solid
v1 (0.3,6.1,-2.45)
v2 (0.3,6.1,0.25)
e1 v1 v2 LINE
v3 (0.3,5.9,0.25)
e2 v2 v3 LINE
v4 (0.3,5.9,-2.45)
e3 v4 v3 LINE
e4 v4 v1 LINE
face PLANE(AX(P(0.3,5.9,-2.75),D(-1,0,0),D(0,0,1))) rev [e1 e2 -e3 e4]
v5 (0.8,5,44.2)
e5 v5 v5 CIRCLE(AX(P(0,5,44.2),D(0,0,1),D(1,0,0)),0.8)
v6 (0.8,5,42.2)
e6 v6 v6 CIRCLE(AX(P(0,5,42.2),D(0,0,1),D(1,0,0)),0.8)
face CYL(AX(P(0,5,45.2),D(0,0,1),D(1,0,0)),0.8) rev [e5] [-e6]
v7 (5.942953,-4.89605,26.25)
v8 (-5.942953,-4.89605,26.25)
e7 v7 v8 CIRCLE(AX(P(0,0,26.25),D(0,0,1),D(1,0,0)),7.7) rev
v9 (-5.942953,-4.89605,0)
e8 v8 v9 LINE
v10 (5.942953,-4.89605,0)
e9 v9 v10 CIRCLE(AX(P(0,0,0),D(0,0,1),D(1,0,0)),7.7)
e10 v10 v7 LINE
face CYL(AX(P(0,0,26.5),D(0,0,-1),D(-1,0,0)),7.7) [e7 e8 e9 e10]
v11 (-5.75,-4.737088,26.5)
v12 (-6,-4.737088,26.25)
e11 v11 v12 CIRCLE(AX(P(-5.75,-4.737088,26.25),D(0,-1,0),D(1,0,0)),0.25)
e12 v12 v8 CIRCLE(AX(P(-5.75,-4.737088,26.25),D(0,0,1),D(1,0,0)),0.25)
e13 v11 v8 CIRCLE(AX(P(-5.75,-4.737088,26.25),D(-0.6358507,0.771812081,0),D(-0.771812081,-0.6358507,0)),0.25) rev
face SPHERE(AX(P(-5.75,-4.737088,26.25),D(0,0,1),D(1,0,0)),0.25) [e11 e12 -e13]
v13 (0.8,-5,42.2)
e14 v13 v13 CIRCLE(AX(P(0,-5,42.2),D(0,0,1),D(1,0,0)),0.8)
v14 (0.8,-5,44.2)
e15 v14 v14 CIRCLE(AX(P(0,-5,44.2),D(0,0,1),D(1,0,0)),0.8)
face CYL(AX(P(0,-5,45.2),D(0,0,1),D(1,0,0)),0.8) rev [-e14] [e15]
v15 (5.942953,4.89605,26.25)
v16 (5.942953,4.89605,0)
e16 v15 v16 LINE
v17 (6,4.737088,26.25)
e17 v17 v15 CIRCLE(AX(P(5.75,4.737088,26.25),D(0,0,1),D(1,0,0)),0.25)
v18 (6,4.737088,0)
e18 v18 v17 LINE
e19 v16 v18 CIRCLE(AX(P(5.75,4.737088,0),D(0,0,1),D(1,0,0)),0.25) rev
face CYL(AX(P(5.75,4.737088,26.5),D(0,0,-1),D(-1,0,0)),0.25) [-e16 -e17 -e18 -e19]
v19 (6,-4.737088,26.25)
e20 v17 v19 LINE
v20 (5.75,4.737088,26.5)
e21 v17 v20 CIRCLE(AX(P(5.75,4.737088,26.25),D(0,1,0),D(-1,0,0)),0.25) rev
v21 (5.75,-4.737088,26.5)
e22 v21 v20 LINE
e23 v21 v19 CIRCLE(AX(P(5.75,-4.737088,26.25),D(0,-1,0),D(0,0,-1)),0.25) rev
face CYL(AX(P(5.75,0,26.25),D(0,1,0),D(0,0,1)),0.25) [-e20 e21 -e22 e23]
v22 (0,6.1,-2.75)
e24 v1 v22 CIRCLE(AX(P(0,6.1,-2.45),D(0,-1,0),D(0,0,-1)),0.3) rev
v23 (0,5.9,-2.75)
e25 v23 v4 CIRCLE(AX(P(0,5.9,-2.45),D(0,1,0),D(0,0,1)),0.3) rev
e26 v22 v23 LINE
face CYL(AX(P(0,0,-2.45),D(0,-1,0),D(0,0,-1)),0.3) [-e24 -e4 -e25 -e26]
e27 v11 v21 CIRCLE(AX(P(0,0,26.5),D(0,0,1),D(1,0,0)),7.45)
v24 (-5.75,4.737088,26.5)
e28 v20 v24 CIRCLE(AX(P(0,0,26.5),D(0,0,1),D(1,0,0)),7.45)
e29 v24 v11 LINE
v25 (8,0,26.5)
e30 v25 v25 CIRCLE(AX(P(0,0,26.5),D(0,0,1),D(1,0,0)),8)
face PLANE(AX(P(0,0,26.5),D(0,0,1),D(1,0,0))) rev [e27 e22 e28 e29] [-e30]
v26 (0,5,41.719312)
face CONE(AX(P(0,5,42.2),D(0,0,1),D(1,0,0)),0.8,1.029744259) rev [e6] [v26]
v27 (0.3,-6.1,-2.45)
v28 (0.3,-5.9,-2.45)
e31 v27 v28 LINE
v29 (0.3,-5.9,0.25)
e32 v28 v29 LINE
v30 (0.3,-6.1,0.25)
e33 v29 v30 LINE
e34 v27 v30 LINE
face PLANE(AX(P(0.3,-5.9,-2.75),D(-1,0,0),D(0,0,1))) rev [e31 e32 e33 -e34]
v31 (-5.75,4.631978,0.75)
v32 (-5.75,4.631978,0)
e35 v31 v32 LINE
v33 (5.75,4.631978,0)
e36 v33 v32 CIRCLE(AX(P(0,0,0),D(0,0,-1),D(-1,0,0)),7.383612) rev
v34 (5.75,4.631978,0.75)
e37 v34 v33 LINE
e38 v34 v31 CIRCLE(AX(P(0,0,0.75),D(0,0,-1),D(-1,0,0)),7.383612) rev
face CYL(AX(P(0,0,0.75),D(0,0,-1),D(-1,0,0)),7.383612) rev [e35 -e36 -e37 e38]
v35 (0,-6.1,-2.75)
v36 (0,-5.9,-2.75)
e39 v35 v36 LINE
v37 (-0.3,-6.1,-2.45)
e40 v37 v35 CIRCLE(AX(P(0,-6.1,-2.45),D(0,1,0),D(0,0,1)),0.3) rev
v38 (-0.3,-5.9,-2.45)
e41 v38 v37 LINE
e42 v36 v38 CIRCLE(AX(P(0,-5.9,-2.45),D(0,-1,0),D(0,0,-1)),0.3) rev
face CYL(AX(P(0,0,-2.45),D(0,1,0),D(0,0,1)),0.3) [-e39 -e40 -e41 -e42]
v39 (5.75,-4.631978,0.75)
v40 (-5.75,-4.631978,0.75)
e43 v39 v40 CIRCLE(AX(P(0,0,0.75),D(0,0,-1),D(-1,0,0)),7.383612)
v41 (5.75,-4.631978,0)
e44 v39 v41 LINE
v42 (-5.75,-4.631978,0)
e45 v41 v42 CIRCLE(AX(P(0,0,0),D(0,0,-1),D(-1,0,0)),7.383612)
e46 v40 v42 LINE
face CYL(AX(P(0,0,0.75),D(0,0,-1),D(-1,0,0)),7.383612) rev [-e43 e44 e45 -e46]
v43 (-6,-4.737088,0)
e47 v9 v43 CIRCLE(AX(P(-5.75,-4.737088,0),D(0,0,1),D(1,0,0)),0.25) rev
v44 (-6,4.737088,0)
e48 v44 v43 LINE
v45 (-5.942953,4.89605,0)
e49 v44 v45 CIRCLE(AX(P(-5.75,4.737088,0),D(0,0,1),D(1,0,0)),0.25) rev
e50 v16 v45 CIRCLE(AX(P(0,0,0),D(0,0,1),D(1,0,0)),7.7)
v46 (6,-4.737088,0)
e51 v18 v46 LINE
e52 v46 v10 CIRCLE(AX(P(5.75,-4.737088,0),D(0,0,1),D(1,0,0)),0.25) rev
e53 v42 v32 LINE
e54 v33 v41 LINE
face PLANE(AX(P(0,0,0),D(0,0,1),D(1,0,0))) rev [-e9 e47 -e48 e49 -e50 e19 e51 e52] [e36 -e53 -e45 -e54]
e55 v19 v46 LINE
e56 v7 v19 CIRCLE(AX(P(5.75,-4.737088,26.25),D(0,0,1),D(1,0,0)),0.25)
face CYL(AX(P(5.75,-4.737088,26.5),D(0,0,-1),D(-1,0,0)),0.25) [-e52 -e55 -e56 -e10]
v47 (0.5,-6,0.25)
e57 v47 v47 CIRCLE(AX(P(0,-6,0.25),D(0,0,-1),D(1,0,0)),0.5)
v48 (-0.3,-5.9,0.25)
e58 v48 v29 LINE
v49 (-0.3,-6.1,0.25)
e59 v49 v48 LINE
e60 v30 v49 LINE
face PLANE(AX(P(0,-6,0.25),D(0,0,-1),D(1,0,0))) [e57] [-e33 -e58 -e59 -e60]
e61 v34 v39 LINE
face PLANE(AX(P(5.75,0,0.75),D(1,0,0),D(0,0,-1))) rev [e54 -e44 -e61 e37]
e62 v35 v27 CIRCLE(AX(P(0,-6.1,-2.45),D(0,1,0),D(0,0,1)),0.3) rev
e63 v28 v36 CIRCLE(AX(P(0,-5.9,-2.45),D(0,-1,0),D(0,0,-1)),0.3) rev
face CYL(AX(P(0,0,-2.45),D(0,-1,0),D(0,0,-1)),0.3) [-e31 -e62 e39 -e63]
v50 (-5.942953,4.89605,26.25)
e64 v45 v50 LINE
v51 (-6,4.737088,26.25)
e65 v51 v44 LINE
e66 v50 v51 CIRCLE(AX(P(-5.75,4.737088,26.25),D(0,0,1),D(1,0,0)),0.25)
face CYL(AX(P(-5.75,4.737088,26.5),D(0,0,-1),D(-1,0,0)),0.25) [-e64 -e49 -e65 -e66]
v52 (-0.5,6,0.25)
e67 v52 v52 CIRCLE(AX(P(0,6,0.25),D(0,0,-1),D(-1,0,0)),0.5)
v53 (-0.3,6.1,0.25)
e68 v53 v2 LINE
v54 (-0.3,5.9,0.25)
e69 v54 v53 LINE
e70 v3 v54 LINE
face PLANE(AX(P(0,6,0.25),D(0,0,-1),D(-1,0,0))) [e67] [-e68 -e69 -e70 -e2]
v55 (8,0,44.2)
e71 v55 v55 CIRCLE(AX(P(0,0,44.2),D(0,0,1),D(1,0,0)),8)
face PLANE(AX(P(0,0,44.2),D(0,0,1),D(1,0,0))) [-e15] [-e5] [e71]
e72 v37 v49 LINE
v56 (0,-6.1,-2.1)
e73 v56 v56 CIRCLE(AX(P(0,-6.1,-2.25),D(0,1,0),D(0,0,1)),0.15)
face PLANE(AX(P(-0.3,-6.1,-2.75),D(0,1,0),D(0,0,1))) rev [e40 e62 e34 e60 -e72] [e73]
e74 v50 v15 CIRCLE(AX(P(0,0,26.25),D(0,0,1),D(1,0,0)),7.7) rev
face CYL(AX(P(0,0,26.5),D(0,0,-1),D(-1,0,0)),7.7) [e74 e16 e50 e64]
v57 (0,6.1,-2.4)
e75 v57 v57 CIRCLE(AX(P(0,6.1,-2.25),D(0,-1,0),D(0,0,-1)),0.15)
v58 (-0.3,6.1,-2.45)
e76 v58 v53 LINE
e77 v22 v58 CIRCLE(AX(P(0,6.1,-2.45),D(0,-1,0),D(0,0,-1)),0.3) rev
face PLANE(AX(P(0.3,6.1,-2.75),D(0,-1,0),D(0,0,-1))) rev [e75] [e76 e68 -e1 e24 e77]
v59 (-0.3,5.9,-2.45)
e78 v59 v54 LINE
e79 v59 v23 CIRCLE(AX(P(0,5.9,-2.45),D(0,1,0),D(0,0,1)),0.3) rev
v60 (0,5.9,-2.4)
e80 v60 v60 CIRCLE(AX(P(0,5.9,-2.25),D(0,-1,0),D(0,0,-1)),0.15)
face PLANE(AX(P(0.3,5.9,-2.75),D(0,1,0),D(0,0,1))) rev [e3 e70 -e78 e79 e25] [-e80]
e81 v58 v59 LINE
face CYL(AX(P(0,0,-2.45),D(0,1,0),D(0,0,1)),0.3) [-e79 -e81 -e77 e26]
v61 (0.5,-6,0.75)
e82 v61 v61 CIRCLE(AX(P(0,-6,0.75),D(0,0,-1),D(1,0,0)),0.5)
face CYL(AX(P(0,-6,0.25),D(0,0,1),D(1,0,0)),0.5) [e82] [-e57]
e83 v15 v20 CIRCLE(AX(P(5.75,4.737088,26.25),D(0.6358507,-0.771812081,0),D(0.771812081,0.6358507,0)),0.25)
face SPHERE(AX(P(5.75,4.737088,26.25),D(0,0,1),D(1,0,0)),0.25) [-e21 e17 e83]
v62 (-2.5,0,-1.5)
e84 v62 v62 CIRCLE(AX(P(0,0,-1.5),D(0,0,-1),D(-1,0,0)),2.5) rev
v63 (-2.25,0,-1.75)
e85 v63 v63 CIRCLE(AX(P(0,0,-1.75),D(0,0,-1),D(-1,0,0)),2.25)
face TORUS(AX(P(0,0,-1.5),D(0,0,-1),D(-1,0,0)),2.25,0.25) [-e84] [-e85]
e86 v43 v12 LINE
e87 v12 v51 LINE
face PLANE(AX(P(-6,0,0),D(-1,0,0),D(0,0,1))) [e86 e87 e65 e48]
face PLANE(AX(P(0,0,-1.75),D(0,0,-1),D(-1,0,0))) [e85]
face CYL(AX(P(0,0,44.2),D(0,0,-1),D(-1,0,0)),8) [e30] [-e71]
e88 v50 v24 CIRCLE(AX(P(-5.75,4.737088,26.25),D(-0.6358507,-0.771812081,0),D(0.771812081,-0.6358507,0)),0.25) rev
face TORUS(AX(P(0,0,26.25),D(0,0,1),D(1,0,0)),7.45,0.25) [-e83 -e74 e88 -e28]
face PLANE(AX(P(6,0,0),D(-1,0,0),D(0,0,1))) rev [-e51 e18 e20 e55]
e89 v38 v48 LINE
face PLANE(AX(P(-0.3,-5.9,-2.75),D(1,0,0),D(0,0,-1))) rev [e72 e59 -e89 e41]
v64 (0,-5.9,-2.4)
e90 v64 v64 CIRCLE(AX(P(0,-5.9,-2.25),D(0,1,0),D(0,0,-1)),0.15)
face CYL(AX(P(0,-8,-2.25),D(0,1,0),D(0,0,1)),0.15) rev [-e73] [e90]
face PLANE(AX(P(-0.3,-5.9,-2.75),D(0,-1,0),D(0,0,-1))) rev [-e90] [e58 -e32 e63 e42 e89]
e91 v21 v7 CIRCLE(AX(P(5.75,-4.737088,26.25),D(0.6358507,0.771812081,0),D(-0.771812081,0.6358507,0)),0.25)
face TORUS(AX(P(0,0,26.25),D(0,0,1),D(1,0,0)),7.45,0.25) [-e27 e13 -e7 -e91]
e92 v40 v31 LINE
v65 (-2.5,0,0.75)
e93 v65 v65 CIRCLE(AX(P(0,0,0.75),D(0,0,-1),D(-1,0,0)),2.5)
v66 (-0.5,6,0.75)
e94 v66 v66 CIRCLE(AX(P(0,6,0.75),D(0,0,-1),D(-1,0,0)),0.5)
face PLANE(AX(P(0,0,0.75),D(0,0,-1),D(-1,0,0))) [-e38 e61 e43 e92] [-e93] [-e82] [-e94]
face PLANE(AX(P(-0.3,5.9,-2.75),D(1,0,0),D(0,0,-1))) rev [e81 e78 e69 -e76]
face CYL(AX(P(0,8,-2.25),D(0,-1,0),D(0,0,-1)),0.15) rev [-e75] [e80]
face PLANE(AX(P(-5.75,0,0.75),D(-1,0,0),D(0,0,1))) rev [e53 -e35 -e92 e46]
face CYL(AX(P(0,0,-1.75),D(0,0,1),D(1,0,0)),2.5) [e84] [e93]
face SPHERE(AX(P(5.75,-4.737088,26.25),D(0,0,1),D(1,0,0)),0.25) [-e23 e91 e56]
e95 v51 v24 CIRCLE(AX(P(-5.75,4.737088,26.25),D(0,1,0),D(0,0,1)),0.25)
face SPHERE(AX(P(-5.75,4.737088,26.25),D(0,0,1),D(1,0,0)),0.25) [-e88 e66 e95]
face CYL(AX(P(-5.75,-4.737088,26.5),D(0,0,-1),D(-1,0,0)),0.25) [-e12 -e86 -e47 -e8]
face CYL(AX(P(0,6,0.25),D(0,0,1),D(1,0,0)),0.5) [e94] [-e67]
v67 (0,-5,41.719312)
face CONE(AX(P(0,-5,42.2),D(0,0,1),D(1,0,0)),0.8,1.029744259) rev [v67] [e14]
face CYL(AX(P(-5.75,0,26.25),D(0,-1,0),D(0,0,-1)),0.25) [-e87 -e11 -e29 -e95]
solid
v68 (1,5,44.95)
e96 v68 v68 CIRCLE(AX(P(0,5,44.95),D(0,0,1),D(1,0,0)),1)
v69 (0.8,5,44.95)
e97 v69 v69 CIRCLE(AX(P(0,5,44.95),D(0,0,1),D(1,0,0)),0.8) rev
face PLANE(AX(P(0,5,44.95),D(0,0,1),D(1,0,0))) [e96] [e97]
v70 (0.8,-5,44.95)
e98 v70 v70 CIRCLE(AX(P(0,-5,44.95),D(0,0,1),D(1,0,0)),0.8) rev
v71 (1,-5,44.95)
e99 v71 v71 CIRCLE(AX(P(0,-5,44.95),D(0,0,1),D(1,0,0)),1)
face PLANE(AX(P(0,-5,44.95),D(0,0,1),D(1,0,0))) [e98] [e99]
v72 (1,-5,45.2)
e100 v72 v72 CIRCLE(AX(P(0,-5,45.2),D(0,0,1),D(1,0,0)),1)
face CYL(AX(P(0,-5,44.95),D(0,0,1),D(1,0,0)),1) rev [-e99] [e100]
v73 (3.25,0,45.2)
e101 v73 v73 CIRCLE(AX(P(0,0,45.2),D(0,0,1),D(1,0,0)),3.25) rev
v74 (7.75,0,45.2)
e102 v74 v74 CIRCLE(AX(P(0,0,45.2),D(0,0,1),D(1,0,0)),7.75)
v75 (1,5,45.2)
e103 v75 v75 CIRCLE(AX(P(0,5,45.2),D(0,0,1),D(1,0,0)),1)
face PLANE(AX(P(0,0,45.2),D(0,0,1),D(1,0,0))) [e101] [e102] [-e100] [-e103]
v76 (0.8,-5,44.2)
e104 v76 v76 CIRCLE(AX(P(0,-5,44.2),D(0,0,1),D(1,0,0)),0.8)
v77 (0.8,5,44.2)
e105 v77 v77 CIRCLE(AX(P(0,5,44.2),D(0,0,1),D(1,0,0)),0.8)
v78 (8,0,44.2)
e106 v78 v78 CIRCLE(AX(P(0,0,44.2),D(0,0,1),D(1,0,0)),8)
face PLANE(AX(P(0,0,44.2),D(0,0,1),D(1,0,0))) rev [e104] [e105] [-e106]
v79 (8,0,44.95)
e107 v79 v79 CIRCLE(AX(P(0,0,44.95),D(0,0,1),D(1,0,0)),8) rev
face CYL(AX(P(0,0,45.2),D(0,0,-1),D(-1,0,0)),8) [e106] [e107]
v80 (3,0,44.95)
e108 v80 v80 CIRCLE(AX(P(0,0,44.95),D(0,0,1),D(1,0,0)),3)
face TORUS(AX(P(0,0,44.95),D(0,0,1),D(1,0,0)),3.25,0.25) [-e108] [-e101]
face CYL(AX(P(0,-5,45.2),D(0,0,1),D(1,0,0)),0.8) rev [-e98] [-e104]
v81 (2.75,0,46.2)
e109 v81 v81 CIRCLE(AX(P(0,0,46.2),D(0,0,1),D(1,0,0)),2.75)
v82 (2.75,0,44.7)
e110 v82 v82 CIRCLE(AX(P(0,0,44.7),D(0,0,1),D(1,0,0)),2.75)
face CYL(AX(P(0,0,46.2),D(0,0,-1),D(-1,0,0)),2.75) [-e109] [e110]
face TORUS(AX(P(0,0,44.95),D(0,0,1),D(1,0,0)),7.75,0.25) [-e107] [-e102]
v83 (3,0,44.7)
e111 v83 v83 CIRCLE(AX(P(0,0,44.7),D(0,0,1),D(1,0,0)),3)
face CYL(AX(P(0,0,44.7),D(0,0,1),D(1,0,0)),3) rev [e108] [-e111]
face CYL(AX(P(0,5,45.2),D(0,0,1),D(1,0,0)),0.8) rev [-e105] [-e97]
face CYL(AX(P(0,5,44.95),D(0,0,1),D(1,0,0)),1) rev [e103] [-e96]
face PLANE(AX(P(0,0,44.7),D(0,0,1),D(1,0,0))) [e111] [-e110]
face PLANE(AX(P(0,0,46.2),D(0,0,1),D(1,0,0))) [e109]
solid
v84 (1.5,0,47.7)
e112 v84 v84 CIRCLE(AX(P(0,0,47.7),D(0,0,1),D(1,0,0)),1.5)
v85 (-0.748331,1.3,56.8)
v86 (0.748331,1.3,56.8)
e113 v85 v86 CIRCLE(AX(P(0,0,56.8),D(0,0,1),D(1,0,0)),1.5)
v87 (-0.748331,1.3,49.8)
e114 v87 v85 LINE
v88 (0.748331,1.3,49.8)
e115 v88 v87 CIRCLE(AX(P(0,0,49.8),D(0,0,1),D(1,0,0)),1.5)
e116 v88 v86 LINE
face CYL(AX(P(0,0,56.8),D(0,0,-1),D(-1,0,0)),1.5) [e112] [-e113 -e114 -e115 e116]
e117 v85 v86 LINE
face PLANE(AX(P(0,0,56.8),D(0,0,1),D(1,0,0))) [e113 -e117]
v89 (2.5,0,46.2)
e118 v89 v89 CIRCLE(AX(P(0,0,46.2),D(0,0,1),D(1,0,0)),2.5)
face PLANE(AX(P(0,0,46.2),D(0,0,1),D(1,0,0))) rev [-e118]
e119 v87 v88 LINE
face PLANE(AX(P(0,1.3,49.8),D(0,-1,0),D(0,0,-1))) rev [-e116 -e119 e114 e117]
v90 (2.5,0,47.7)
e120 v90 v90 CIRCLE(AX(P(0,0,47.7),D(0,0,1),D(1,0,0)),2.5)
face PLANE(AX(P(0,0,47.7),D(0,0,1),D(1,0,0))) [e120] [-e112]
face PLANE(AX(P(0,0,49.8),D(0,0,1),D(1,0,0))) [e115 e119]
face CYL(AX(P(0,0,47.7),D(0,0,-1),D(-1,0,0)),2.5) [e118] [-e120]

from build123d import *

# Parameters (mm, degrees)
SKETCH_1_R                       = 7.7
EXTRUDE_1_DEPTH                  = 26.5
CUT_EXTRUDE_1_DEPTH              = 29.65013089
FILLET_1_R                       = 0.25
SKETCH_4_R                       = 8
EXTRUDE_2_DEPTH                  = 17.7
SKETCH_5_R                       = 8
EXTRUDE_3_DEPTH                  = 1
SKETCH_6_R                       = 3
CUT_EXTRUDE_2_DEPTH              = 0.5
FILLET_3_R                       = 0.25
SKETCH_7_R                       = 2.75
EXTRUDE_4_DEPTH                  = 1.5
SKETCH_8_R                       = 2.5
EXTRUDE_5_DEPTH                  = 1.5
SKETCH_9_R                       = 1.5
EXTRUDE_6_DEPTH                  = 9.1
CUT_EXTRUDE_3_DEPTH              = 7
M2X0_4_1_AT_2_COUNT              = 2
M2X0_4_1_AT_2_PITCH              = 10
SKETCH_16_R                      = 1
CUT_EXTRUDE_4_DEPTH              = 0.25
CUT_EXTRUDE_5_DEPTH              = 0.75
SKETCH_18_R                      = 2.5
EXTRUDE_7_DEPTH                  = 2.5
FILLET_4_R                       = 0.25
SKETCH_19_R                      = 0.5
EXTRUDE_8_DEPTH                  = 0.5
SKETCH_20_W                      = 0.6
SKETCH_20_H                      = 0.2
EXTRUDE_9_DEPTH                  = 3
SKETCH_21_R                      = 0.15
CUT_EXTRUDE_6_DEPTH              = 60.02075906
FILLET_5_R                       = 0.3
PATTERN_CIRCULAR_1_COUNT         = 2
FILLET_5_OF_PATTERN_CIRCULAR_1_R = 0.3


with BuildPart() as part:
    # 草圖1 → 填料-伸長1 (new body)
    with BuildSketch(Plane.XY):
        Circle(SKETCH_1_R)
    extrude(amount=EXTRUDE_1_DEPTH)

    # 草圖2 → 除料-伸長1 (cut, through all)
    with BuildSketch(Plane.XY.offset(26.5)):
        with BuildLine():
            Line((-6, -4.825971405), (-6, 4.825971405))
            ThreePointArc((-6, 4.825971405), (-7.7, 0), (-6, -4.825971405))
        make_face()
        with BuildLine():
            ThreePointArc((7.7, 0), (7.262575301, 2.558319761), (6, 4.825971405))
            Line((6, 4.825971405), (6, -4.825971405))
            ThreePointArc((6, -4.825971405), (7.262575301, -2.558319761), (7.7, 0))
        make_face()
    extrude(amount=-CUT_EXTRUDE_1_DEPTH, mode=Mode.SUBTRACT)

    # 圓角1
    fillet_1_edges = [part.edges().sort_by_distance(p)[0] for p in [
        (-6, 0, 26.5),
        (-6, 4.825971405, 13.25),
        (-6, -4.825971405, 13.25),
        (6, 4.825971405, 13.25),
        (6, -4.825971405, 13.25),
        (6, 0, 26.5),
        (0, 7.7, 26.5),
        (0, -7.7, 26.5),
    ]]
    fillet(fillet_1_edges, radius=FILLET_1_R)

    # 草圖4 → 填料-伸長2 (add)
    with BuildSketch(Plane.XY.offset(26.5)):
        Circle(SKETCH_4_R)
    extrude(amount=EXTRUDE_2_DEPTH)


with BuildPart() as body_2:
    # 草圖5 → 填料-伸長3 (new body)
    with BuildSketch(Plane.XY.offset(44.2)):
        Circle(SKETCH_5_R)
    extrude(amount=EXTRUDE_3_DEPTH)

    # 草圖6 → 除料-伸長2 (cut)
    with BuildSketch(Plane.XY.offset(45.2)):
        Circle(SKETCH_6_R)
    extrude(amount=-CUT_EXTRUDE_2_DEPTH, mode=Mode.SUBTRACT)

    # 圓角3
    fillet_3_edges = [body_2.edges().sort_by_distance(p)[0] for p in [
        (-8, 0, 45.2),
        (-3, 0, 45.2),
    ]]
    fillet(fillet_3_edges, radius=FILLET_3_R)

    # 草圖7 → 填料-伸長4 (add)
    with BuildSketch(Plane.XY.offset(44.7)):
        Circle(SKETCH_7_R)
    extrude(amount=EXTRUDE_4_DEPTH)


with BuildPart() as body_3:
    # 草圖8 → 填料-伸長5 (new body)
    with BuildSketch(Plane.XY.offset(46.2)):
        Circle(SKETCH_8_R)
    extrude(amount=EXTRUDE_5_DEPTH)

    # 草圖9 → 填料-伸長6 (add)
    with BuildSketch(Plane.XY.offset(47.7)):
        Circle(SKETCH_9_R)
    extrude(amount=EXTRUDE_6_DEPTH)

    # 草圖10 → 除料-伸長3 (cut)
    with BuildSketch(Plane.XY.offset(56.8)):
        with BuildLine():
            Line((-0.748331477, 1.3), (0.748331477, 1.3))
            ThreePointArc((0.748331477, 1.3), (0, 1.5), (-0.748331477, 1.3))
        make_face()
    extrude(amount=-CUT_EXTRUDE_3_DEPTH, mode=Mode.SUBTRACT)


with BuildPart() as m2x0_4_1_tool:
    # 草圖15 → M2x0.4 螺紋孔1 (revolve)
    with BuildSketch(Plane(origin=(0, -5, 45.2), x_dir=(0, -1, 0), z_dir=(1, 0, 0))):
        Polygon((0, 0), (0, 3.480688495), (0.8, 3), (0.8, 0), align=None)
    m2x0_4_1 = revolve(axis=Axis((0, -5, 51.55), (0, 0, -1)))


with BuildPart() as part_1:
    add(part.part)

    # M2x0.4 螺紋孔1: cut by m2x0_4_1_tool
    add(m2x0_4_1_tool.part, mode=Mode.SUBTRACT)


with BuildPart() as body_2_1:
    add(body_2.part)

    # M2x0.4 螺紋孔1: cut by m2x0_4_1_tool
    add(m2x0_4_1_tool.part, mode=Mode.SUBTRACT)


with BuildPart() as m2x0_4_1_at_2_tool:
    # M2x0.4 螺紋孔1 at 2: M2x0.4 螺紋孔1 ×2
    with Locations(*[(0, i * M2X0_4_1_AT_2_PITCH, 0) for i in range(1, M2X0_4_1_AT_2_COUNT)]):
        add(m2x0_4_1)


with BuildPart() as part_2:
    add(part_1.part)

    # M2x0.4 螺紋孔1 at 2: cut by m2x0_4_1_at_2_tool
    add(m2x0_4_1_at_2_tool.part, mode=Mode.SUBTRACT)

    # 草圖17 → 除料-伸長5 (cut)
    with BuildSketch(Plane(origin=(0, 0, 0), x_dir=(-1, 0, 0), z_dir=(0, 0, -1))):
        with BuildLine():
            Line((-5.75, 4.631978395), (-5.75, -4.631978395))
            ThreePointArc((-5.75, -4.631978395), (0, -7.383611844), (5.75, -4.631978395))
            Line((5.75, -4.631978395), (5.75, 4.631978395))
            ThreePointArc((5.75, 4.631978395), (0, 7.383611844), (-5.75, 4.631978395))
        make_face()
    extrude(amount=-CUT_EXTRUDE_5_DEPTH, mode=Mode.SUBTRACT)

    # 草圖18 → 填料-伸長7 (add)
    with BuildSketch(Plane(origin=(0, 0, 0.75), x_dir=(-1, 0, 0), z_dir=(0, 0, -1))):
        with Locations(Location((0, 0, 0), (0, 0, 180))):
            Circle(SKETCH_18_R)
    extrude(amount=EXTRUDE_7_DEPTH)

    # 圓角4
    fillet_4_edges = [part_2.edges().sort_by_distance(p)[0] for p in [
        (-2.5, 0, -1.75),
    ]]
    fillet(fillet_4_edges, radius=FILLET_4_R)

    # 草圖19 → 填料-伸長8 (add)
    with BuildSketch(Plane(origin=(0, 0, 0.75), x_dir=(-1, 0, 0), z_dir=(0, 0, -1))):
        with Locations((0, 6)):
            Circle(SKETCH_19_R)
    extrude_8 = extrude(amount=EXTRUDE_8_DEPTH)

    # 草圖20 → 填料-伸長9 (add)
    with BuildSketch(Plane(origin=(0, 0, 0.25), x_dir=(-1, 0, 0), z_dir=(0, 0, -1))):
        with Locations((0, 6)):
            Rectangle(SKETCH_20_W, SKETCH_20_H)
    extrude_9 = extrude(amount=EXTRUDE_9_DEPTH)

    # 草圖21 → 除料-伸長6 (cut, through all)
    with BuildSketch(Plane.XZ.offset(-5.9)):
        with Locations(Location((0, -2.25, 0), (0, 0, 270))):
            Circle(SKETCH_21_R)
    cut_extrude_6 = extrude(amount=-CUT_EXTRUDE_6_DEPTH, mode=Mode.SUBTRACT)

    # 圓角5
    fillet_5_edges = [part_2.edges().sort_by_distance(p)[0] for p in [
        (-0.3, 6, -2.75),
        (0.3, 6, -2.75),
    ]]
    fillet(fillet_5_edges, radius=FILLET_5_R - 0.0001)  # a hair under: the kernel refuses the full size

    # 環狀複製排列1: 填料-伸長8, 填料-伸長9, 除料-伸長6 ×2 about axis
    pattern_circular_1_axis = Axis((0, 0, 0), (0, 0, 1))
    add([extrude_8.rotate(pattern_circular_1_axis, i * 360 / PATTERN_CIRCULAR_1_COUNT) for i in range(1, PATTERN_CIRCULAR_1_COUNT)])
    add([extrude_9.rotate(pattern_circular_1_axis, i * 360 / PATTERN_CIRCULAR_1_COUNT) for i in range(1, PATTERN_CIRCULAR_1_COUNT)])
    add([cut_extrude_6.rotate(pattern_circular_1_axis, i * 360 / PATTERN_CIRCULAR_1_COUNT) for i in range(1, PATTERN_CIRCULAR_1_COUNT)], mode=Mode.SUBTRACT)

    # 圓角5 of 環狀複製排列1
    fillet_5_of_pattern_circular_1_edges = [part_2.edges().sort_by_distance(p)[0] for p in [
        (0.3, -6, -2.75),
        (-0.3, -6, -2.75),
    ]]
    fillet(fillet_5_of_pattern_circular_1_edges, radius=FILLET_5_OF_PATTERN_CIRCULAR_1_R - 0.0001)  # a hair under: the kernel refuses the full size


with BuildPart() as body_2_2:
    add(body_2_1.part)

    # M2x0.4 螺紋孔1 at 2: cut by m2x0_4_1_at_2_tool
    add(m2x0_4_1_at_2_tool.part, mode=Mode.SUBTRACT)

    # 草圖16 → 除料-伸長4 (cut)
    with BuildSketch(Plane.XY.offset(45.2)):
        with Locations((0, -5)):
            Circle(SKETCH_16_R)
        with Locations((0, 5)):
            Circle(SKETCH_16_R)
    extrude(amount=-CUT_EXTRUDE_4_DEPTH, mode=Mode.SUBTRACT)


solid = Compound([body_3.part, part_2.part, body_2_2.part])
